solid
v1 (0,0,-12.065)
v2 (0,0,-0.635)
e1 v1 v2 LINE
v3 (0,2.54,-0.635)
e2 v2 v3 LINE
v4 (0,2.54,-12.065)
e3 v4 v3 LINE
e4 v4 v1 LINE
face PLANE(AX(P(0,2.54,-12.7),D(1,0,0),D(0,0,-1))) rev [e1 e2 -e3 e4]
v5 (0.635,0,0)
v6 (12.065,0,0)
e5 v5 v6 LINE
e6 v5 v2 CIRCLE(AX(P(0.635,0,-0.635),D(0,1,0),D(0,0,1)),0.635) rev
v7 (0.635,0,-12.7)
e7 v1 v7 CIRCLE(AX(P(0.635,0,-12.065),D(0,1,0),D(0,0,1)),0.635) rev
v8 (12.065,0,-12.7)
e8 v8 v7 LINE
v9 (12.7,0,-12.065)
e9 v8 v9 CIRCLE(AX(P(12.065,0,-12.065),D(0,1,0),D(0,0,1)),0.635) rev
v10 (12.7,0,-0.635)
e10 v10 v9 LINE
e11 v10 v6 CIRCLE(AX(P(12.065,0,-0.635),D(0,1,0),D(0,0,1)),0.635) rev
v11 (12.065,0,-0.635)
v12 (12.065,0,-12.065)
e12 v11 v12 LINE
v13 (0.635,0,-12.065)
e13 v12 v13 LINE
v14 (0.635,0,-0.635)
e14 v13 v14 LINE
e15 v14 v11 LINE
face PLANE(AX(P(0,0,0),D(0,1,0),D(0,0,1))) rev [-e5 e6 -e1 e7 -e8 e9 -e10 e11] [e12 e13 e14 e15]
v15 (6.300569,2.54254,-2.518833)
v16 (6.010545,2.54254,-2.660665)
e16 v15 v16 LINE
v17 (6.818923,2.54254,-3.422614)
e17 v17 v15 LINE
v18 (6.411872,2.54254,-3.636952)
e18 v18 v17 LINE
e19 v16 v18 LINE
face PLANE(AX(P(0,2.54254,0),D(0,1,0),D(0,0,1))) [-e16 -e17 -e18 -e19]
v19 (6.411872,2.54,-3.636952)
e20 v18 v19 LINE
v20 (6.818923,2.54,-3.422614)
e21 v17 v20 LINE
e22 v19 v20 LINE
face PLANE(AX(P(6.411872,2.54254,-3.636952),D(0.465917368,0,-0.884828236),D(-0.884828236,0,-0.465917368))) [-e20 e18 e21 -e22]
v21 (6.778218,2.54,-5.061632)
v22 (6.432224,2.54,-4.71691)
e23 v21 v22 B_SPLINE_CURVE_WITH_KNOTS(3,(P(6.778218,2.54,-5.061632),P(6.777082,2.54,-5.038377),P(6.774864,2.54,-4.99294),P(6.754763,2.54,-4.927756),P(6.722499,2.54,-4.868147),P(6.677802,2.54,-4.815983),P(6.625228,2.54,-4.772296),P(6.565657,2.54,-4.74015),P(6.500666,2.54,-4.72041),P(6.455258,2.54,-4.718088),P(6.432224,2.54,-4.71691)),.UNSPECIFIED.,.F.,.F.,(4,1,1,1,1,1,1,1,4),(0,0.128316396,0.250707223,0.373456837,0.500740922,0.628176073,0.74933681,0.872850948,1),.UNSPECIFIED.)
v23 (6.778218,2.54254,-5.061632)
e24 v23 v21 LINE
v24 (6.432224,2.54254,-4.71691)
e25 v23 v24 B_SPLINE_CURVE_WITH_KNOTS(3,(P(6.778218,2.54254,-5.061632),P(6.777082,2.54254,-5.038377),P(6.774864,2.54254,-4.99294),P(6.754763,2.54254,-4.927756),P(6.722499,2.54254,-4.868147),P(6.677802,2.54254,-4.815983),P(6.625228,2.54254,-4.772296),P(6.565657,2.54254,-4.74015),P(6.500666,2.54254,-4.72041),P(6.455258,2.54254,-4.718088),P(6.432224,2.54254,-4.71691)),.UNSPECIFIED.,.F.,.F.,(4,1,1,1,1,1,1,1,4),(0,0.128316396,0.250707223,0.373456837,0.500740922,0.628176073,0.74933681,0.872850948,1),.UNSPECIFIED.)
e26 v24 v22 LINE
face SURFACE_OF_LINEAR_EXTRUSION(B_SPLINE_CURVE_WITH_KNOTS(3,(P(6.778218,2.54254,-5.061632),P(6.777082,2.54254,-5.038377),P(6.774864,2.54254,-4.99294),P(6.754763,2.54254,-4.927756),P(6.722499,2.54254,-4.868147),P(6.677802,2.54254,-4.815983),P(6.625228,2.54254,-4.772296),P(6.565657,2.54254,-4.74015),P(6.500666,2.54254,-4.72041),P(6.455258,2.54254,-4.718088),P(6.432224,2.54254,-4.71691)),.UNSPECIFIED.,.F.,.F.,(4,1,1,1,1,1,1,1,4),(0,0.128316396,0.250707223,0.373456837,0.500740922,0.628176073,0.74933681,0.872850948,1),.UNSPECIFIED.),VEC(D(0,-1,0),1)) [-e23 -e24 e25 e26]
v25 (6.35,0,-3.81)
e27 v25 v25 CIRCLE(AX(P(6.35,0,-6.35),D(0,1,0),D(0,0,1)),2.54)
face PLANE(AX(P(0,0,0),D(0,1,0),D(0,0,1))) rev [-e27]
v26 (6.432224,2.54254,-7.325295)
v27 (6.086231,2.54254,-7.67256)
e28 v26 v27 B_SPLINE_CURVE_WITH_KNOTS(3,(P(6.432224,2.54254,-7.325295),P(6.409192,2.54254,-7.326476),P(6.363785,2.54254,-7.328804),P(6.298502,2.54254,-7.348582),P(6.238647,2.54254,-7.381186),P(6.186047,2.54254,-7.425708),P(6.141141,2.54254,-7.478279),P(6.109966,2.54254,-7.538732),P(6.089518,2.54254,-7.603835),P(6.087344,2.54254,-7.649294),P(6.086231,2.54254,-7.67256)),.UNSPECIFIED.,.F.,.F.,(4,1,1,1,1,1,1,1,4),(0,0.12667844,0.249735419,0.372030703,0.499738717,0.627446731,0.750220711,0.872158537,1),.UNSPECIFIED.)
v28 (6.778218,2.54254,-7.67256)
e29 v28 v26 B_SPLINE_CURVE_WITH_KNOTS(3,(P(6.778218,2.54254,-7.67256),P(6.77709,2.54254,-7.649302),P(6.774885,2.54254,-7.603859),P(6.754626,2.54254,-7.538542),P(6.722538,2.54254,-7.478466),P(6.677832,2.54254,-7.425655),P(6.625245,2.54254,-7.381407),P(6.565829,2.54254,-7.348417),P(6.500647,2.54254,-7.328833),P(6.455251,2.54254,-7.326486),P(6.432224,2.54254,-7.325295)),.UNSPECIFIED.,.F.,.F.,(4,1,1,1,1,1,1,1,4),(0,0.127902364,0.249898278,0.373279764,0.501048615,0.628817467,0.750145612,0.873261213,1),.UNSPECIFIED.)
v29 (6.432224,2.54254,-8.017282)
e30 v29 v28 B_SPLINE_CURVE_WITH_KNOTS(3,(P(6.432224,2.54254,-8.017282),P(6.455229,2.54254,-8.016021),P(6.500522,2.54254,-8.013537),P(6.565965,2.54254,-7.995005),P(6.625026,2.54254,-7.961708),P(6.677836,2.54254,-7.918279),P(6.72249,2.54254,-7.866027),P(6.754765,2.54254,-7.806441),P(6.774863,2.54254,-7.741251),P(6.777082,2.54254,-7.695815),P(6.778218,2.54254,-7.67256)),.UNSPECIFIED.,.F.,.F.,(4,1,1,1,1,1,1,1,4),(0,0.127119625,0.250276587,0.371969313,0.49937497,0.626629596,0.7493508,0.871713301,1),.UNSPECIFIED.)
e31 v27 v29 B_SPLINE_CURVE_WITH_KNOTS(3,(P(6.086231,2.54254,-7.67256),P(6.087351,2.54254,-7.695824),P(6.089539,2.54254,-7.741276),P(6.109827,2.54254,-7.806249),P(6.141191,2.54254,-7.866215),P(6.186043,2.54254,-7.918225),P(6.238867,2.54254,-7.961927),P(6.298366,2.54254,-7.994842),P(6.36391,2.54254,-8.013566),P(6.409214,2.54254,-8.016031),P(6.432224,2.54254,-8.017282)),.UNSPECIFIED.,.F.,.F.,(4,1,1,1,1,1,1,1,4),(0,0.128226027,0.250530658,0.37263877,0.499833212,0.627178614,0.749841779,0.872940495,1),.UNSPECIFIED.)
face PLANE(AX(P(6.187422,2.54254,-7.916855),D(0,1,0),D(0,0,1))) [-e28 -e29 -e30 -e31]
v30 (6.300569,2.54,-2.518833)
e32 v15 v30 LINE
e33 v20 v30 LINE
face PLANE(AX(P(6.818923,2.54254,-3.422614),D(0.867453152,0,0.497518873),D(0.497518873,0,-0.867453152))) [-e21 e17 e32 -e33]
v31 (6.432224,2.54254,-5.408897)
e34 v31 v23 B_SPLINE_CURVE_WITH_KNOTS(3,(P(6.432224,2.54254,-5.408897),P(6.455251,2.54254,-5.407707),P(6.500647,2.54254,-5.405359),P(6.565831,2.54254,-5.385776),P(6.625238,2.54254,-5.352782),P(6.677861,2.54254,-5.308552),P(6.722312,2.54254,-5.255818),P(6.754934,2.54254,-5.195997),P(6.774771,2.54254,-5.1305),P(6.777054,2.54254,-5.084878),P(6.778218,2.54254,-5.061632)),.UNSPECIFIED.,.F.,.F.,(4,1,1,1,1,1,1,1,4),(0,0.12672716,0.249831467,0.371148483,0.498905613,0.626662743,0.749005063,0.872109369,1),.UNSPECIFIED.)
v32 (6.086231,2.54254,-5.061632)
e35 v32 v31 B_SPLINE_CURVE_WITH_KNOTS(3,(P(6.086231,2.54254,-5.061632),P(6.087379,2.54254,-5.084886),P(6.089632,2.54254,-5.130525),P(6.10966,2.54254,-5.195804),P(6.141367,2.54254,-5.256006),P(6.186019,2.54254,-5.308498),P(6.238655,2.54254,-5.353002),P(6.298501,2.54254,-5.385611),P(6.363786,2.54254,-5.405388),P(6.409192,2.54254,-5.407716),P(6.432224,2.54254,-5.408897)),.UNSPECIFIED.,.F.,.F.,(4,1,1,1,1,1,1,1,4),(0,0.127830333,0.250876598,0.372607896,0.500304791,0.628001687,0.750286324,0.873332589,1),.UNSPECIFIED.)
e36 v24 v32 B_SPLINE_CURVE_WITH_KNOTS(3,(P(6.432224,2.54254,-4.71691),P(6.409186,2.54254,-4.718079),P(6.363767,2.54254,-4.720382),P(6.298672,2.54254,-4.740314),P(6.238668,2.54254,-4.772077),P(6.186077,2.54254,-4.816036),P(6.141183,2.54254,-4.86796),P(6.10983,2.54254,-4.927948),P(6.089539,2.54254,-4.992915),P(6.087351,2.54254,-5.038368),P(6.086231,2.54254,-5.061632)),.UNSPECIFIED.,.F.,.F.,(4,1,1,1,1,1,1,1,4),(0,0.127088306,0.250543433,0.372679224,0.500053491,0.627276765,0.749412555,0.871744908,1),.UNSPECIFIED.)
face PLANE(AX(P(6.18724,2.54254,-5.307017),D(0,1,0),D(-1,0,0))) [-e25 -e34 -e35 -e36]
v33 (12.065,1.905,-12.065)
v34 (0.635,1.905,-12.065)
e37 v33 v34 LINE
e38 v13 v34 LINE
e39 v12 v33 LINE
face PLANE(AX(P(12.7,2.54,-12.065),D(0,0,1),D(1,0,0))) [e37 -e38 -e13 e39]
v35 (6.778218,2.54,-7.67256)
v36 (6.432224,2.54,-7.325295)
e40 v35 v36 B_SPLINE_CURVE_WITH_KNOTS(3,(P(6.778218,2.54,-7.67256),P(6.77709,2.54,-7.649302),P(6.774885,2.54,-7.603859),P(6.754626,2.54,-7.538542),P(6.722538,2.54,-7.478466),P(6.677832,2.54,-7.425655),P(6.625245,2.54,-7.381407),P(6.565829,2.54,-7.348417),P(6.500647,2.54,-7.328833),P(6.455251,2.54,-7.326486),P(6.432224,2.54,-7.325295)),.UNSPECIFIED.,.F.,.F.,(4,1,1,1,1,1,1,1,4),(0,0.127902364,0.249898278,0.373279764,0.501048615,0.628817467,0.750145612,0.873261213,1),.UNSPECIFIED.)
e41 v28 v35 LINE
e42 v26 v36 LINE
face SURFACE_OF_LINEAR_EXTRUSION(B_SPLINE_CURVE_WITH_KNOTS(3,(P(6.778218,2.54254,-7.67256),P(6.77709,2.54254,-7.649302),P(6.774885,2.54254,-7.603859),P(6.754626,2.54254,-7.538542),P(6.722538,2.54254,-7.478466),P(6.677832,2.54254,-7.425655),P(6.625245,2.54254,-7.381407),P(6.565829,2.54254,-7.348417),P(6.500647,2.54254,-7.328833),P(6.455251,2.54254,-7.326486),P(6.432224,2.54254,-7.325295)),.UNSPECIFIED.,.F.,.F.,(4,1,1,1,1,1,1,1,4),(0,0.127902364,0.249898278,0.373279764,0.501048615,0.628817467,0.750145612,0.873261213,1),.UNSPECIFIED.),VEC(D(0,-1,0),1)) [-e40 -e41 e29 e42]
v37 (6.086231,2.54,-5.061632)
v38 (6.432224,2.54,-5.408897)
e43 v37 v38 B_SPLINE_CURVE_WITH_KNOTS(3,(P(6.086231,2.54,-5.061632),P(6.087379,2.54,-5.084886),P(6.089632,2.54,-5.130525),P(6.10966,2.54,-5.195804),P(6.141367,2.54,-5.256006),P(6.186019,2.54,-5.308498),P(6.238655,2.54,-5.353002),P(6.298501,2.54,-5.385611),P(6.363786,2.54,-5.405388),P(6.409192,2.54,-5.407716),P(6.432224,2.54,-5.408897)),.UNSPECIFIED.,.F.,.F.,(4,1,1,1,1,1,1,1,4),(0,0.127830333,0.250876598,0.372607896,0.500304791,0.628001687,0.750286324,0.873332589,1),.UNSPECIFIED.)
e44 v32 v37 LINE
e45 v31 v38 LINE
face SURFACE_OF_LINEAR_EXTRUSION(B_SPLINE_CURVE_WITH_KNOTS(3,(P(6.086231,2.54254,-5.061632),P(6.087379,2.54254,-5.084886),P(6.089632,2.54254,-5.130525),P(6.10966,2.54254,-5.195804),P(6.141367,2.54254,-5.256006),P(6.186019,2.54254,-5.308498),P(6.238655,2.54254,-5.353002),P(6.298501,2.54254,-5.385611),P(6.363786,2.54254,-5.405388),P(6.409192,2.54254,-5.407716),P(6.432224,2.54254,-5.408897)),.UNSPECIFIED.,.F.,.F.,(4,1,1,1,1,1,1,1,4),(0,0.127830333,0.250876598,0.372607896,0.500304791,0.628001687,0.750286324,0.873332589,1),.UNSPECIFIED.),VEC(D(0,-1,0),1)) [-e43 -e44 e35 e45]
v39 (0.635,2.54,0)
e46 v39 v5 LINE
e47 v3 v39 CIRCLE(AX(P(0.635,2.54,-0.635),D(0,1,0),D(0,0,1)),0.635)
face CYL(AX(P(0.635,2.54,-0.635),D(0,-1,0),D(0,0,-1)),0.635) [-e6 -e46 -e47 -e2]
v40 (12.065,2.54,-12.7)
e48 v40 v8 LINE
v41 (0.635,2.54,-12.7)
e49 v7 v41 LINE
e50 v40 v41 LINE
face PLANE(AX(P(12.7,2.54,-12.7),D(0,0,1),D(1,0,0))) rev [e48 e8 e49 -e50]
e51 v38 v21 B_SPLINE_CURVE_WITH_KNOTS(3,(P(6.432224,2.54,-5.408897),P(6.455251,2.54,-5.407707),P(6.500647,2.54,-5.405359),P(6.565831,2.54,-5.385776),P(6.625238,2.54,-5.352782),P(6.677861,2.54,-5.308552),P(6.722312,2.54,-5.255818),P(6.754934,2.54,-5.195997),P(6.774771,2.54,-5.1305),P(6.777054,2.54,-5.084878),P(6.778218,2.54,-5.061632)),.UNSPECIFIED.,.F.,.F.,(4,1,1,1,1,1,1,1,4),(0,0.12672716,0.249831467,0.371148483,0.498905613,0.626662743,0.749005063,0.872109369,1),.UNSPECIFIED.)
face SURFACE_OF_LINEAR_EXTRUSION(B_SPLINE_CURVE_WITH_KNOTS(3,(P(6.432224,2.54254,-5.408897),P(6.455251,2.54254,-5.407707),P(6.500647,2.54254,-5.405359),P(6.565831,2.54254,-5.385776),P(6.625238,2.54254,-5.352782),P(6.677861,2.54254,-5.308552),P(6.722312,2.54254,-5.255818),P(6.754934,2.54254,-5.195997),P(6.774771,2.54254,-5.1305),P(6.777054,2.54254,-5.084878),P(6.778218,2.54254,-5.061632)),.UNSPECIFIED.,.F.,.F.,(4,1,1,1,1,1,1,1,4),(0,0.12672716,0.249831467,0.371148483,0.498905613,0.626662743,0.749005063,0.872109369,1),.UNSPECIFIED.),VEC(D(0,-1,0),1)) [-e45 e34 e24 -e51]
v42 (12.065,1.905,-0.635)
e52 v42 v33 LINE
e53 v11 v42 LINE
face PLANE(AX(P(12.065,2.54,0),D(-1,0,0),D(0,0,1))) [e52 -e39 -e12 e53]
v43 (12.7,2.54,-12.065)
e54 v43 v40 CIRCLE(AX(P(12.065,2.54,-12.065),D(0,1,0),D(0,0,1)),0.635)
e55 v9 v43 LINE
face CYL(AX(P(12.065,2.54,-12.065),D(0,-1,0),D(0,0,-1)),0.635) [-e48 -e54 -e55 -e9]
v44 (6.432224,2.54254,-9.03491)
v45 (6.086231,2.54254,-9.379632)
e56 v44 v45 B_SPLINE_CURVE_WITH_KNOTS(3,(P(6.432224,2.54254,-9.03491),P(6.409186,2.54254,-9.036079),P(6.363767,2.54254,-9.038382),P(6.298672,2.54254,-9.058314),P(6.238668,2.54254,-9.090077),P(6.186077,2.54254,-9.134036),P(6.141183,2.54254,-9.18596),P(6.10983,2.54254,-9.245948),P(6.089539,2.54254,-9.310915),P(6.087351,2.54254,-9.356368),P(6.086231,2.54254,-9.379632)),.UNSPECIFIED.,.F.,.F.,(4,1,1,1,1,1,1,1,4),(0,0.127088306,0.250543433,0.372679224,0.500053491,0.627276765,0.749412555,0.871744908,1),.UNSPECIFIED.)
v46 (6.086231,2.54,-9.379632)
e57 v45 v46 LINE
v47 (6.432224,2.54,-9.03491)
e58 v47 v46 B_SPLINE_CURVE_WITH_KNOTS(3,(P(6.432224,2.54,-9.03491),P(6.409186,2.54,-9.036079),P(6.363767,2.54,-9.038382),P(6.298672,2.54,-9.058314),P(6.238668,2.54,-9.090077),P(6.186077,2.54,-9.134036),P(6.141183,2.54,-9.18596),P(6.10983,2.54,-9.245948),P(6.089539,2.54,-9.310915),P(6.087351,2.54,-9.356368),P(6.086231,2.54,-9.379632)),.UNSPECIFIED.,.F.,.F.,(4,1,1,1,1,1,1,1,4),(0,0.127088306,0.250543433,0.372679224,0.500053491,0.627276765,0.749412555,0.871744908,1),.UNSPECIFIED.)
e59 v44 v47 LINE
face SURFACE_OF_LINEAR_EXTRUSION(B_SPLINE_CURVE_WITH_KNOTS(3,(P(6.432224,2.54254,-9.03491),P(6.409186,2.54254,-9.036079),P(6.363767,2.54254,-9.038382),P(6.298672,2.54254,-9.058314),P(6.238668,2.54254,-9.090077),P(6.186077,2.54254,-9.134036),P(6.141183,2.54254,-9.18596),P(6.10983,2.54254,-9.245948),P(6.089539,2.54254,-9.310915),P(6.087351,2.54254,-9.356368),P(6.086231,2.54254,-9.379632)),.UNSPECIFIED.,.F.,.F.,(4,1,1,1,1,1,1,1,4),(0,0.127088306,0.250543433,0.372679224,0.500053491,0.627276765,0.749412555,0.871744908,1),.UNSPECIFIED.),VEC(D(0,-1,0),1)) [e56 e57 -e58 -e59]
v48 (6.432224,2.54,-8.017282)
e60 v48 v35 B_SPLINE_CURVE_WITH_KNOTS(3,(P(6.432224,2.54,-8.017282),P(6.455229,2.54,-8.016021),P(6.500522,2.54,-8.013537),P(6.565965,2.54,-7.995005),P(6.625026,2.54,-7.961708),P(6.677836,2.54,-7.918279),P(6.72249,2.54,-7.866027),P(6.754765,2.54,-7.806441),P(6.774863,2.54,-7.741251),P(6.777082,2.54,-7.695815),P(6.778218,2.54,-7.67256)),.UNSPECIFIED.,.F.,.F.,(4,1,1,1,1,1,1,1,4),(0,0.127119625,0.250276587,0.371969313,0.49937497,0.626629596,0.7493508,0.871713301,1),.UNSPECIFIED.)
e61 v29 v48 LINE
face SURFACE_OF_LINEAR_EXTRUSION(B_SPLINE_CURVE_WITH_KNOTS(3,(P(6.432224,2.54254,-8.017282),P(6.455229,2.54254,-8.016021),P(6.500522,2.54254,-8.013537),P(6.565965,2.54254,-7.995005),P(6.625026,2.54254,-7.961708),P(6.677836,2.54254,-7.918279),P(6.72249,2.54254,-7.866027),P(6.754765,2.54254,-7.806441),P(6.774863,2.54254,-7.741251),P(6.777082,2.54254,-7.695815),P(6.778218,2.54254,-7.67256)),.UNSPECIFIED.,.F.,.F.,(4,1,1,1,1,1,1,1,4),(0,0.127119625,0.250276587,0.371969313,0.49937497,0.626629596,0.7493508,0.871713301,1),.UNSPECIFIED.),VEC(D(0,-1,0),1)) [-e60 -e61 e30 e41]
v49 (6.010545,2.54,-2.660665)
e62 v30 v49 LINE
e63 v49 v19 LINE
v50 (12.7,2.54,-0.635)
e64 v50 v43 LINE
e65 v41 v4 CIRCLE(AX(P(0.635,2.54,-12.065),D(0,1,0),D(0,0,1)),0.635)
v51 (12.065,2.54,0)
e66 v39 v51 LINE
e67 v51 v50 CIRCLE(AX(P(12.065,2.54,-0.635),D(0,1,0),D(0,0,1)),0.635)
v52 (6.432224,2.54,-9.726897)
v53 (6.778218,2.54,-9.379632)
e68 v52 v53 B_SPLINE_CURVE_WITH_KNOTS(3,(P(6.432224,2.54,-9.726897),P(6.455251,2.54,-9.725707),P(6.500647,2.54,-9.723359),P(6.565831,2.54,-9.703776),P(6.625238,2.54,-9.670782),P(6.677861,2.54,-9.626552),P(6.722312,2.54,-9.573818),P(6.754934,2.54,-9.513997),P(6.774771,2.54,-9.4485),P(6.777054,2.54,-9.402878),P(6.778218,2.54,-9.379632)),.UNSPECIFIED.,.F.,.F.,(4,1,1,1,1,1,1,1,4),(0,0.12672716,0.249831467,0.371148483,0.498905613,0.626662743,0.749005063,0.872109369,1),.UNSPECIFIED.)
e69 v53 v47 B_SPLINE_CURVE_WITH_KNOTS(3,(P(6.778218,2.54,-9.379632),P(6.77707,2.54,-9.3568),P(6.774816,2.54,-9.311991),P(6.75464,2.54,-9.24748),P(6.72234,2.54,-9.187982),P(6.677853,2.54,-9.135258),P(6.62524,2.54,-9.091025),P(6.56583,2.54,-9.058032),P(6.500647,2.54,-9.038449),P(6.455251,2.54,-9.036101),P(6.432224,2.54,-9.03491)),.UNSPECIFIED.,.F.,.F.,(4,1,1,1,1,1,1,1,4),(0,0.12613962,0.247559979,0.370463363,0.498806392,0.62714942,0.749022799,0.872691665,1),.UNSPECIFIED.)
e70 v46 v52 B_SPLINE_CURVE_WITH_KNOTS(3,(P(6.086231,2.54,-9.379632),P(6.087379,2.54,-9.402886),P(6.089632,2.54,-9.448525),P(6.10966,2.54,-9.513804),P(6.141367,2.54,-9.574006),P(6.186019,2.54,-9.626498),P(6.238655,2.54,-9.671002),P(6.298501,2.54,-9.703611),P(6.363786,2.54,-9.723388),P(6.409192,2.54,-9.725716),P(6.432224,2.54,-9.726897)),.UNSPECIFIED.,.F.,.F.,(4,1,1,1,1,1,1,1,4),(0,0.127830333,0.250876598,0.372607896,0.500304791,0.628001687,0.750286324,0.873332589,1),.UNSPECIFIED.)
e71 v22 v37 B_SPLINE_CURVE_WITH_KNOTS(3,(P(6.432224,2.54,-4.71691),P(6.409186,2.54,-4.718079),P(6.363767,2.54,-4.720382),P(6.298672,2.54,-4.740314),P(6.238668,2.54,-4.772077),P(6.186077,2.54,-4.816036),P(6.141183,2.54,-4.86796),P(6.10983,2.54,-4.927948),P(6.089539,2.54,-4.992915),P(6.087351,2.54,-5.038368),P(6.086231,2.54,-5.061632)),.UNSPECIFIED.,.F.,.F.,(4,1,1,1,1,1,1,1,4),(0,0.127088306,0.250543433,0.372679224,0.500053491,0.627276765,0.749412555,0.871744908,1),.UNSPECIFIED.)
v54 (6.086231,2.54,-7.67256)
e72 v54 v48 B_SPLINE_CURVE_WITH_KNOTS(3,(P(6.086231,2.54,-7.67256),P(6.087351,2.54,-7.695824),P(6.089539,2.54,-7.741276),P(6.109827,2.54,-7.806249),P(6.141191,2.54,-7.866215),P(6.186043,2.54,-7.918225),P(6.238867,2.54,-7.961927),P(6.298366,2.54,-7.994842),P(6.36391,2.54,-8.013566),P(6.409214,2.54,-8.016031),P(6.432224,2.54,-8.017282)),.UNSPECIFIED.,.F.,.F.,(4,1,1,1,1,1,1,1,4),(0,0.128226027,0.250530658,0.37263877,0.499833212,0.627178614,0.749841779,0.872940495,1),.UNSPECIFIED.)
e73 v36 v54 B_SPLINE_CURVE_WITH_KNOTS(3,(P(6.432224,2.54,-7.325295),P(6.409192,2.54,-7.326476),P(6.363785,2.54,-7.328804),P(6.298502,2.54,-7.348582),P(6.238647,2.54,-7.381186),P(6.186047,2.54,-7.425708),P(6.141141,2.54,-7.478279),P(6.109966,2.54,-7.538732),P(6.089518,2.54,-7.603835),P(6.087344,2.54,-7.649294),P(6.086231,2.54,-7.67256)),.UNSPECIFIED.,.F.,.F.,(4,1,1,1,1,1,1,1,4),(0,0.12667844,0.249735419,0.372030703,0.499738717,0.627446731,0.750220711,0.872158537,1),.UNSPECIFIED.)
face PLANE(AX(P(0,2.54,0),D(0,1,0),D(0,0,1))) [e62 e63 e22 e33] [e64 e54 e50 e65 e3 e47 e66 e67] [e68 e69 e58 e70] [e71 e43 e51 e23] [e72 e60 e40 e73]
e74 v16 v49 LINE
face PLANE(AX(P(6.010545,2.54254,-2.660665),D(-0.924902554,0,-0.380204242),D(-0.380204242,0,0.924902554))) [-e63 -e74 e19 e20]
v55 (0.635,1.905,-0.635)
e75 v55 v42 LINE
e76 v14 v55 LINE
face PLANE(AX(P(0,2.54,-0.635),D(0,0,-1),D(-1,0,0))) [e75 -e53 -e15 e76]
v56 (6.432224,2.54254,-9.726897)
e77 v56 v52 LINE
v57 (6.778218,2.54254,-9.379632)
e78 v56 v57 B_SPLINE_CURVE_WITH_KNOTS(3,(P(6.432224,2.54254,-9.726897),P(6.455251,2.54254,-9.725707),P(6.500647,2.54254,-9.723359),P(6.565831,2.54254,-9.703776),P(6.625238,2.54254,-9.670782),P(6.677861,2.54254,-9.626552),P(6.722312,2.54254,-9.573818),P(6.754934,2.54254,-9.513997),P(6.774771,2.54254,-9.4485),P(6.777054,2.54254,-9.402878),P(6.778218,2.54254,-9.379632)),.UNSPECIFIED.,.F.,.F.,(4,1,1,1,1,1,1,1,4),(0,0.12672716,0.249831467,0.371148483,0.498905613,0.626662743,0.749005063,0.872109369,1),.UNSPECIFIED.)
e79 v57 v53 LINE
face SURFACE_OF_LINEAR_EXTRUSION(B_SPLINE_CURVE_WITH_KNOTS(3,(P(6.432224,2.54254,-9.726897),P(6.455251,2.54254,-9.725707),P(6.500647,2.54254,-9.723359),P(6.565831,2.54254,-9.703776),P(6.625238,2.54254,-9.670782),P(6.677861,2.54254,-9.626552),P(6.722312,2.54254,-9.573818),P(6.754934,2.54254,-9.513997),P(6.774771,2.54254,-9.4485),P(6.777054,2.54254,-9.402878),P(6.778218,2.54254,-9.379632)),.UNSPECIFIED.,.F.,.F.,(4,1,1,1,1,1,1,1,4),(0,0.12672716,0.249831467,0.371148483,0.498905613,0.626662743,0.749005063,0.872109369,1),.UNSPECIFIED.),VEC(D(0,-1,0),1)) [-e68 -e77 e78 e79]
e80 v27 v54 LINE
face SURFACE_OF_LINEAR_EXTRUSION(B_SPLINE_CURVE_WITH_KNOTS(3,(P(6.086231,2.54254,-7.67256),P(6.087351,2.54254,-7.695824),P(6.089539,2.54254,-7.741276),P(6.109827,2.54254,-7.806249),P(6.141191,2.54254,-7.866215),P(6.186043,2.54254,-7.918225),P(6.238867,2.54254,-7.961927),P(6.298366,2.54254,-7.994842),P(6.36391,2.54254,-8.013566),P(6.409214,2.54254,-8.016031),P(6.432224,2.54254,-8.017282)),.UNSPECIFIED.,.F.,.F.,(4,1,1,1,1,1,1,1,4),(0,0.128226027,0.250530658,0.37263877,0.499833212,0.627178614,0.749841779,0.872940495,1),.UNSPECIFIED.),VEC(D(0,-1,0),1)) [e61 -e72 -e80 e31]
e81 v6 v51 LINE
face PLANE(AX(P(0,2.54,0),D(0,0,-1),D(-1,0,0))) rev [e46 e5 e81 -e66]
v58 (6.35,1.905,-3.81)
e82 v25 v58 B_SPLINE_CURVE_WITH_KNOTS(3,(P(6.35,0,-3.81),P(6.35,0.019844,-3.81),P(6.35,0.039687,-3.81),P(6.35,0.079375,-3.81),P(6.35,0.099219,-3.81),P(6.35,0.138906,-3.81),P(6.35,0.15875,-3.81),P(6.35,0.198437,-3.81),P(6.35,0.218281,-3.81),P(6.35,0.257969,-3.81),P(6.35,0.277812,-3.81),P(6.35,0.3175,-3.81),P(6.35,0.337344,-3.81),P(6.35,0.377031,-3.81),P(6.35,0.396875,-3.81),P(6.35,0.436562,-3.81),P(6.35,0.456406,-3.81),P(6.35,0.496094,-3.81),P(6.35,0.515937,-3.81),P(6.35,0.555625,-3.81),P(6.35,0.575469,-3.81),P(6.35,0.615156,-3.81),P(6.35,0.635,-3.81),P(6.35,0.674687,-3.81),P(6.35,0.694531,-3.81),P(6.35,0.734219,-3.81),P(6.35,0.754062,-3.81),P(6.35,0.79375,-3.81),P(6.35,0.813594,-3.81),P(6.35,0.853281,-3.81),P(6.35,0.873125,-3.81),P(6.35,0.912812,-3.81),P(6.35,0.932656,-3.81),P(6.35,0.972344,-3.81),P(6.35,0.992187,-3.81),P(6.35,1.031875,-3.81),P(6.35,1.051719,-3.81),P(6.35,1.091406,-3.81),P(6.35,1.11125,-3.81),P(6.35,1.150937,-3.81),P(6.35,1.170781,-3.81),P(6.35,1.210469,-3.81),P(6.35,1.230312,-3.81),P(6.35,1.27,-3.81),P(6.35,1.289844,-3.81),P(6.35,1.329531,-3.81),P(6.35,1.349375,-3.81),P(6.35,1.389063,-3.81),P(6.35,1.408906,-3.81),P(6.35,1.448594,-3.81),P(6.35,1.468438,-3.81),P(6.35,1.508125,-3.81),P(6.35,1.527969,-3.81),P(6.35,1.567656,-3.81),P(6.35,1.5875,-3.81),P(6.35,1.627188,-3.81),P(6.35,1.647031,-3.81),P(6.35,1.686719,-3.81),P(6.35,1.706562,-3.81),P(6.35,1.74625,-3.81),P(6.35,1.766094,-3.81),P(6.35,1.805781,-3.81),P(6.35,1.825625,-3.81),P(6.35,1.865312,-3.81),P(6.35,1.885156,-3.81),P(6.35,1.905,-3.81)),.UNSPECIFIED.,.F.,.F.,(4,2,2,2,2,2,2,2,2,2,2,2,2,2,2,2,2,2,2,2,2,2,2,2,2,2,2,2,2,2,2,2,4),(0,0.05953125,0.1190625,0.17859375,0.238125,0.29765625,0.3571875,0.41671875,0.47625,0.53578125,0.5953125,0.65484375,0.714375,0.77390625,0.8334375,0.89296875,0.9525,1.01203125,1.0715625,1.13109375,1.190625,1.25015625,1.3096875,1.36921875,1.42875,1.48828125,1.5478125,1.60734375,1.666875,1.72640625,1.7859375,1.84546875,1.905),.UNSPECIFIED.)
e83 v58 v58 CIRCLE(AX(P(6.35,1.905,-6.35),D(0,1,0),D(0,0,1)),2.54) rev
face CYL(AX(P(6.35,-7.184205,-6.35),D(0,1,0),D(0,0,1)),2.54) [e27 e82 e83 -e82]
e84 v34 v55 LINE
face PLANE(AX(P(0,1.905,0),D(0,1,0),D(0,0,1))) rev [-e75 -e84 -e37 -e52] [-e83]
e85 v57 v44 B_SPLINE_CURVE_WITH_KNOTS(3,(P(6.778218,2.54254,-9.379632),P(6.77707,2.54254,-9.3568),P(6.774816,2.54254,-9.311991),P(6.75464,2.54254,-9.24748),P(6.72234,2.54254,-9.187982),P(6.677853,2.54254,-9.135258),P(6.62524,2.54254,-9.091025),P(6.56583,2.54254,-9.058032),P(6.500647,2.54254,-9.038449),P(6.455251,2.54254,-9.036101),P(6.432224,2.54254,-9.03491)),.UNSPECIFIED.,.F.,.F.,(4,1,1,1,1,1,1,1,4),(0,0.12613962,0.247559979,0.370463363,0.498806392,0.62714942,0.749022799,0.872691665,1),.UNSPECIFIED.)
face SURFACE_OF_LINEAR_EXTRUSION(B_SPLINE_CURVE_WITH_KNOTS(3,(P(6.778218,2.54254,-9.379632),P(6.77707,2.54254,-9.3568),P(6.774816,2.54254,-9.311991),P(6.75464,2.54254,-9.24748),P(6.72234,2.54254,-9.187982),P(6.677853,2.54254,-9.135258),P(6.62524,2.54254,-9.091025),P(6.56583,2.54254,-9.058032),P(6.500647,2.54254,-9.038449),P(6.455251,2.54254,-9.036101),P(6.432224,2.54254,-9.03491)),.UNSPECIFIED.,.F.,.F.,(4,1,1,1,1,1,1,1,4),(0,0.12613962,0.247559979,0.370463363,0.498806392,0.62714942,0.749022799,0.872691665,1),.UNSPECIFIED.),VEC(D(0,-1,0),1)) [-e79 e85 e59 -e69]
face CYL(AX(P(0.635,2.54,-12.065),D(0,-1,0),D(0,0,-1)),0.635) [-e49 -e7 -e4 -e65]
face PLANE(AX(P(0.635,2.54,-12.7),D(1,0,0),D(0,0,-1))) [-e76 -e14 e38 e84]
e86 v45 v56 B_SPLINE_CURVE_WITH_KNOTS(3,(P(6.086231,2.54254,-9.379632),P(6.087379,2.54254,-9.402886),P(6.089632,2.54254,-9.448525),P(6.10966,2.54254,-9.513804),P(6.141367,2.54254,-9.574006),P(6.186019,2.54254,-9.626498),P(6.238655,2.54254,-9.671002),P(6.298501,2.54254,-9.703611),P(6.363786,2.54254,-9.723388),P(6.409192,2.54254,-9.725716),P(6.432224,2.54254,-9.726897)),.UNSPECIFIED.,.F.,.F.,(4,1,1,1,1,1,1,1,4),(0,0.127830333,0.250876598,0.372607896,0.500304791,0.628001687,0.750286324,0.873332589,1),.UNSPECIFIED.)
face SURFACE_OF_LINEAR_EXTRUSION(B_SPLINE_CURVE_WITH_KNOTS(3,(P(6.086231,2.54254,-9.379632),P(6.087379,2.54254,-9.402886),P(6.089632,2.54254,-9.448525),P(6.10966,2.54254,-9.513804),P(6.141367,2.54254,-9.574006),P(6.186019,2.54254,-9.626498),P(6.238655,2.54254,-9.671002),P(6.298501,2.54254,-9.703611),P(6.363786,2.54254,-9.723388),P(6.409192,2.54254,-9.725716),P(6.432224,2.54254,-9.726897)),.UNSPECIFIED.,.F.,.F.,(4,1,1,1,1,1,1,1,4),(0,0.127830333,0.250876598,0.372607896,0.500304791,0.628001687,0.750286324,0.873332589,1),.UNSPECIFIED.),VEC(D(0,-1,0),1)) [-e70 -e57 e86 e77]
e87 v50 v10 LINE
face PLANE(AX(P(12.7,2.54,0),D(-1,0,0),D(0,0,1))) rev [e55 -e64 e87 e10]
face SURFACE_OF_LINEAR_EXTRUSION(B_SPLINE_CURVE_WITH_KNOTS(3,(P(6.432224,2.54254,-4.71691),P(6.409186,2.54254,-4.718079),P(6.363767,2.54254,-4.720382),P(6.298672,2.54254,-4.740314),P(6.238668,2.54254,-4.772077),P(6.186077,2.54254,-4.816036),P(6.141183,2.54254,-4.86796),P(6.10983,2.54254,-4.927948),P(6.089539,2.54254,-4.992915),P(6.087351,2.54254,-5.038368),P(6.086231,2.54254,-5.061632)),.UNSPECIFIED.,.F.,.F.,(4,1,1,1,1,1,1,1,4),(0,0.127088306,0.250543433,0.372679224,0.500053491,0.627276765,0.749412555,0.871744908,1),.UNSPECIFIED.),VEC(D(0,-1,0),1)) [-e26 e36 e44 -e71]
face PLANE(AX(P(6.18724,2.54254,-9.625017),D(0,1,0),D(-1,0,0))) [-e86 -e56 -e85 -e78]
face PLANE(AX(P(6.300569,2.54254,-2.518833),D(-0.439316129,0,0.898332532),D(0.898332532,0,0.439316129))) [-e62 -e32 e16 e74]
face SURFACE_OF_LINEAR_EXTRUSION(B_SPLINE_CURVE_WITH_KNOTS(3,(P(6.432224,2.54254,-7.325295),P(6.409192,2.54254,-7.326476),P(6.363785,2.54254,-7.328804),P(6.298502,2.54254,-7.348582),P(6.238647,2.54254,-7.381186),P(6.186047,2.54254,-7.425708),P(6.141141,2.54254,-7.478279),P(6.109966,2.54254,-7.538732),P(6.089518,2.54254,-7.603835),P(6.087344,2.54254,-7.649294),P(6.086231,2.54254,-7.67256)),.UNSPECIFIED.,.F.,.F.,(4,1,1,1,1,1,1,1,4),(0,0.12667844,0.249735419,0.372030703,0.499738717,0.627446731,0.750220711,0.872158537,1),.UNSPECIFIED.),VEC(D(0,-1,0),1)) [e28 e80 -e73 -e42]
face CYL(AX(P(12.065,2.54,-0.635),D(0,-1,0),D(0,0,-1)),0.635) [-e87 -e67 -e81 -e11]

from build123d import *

# Parameters (mm, degrees)
SKETCH1_W           = 12.7
SKETCH1_H           = 12.7
BOSS_EXTRUDE1_DEPTH = 2.54
FILLET1_R           = 0.635
SHELL1_START        = 0.635
SHELL1_OUTLINE_W    = 1.905
SHELL1_OUTLINE_H    = 11.43
SHELL1_DEPTH        = 11.43
SKETCH2_R           = 2.54
BOSS_EXTRUDE2_DEPTH = 1.905
BOSS_EXTRUDE3_DEPTH = 0.00254


# Read off the part's stored shape, not the designer's step: Shell1
with BuildPart() as part:
    # Sketch1 → Boss-Extrude1 (new body)
    with BuildSketch(Plane(origin=(0, 0, 0), x_dir=(1, 0, 0), z_dir=(0, 1, 0))):
        with Locations((6.35, 6.35)):
            Rectangle(SKETCH1_W, SKETCH1_H)
    extrude(amount=BOSS_EXTRUDE1_DEPTH)

    # Fillet1
    fillet1_edges = [part.edges().sort_by_distance(p)[0] for p in [
        (0, 1.27, -12.7),
        (12.7, 1.27, -12.7),
        (12.7, 1.27, 0),
        (0, 1.27, 0),
    ]]
    fillet(fillet1_edges, radius=FILLET1_R)

    # Shell1 outline → Shell1 (cut)
    with BuildSketch(Plane.YZ.offset(SHELL1_START)):
        with Locations((0.9525, -6.35)):
            Rectangle(SHELL1_OUTLINE_W, SHELL1_OUTLINE_H)
    extrude(amount=SHELL1_DEPTH, mode=Mode.SUBTRACT)

    # Sketch2 → Boss-Extrude2 (add)
    with BuildSketch(Plane(origin=(0, 1.905, 0), x_dir=(-1, 0, 0), z_dir=(0, -1, 0))):
        with Locations(Location((-6.35, 6.35, 0), (0, 0, 270))):
            Circle(SKETCH2_R)
    extrude(amount=BOSS_EXTRUDE2_DEPTH)

    # Sketch3 → Boss-Extrude3 (add)
    with BuildSketch(Plane(origin=(0, 2.54, 0), x_dir=(1, 0, 0), z_dir=(0, 1, 0))):
        with BuildLine():
            add(Edge.make_bspline(
                [(6.432224359, 9.726897436), (6.455251183, 9.725706594), (6.500646544, 9.723358955), (6.565830657, 9.703776202), (6.625237948, 9.670782167), (6.67786071, 9.626551956), (6.722312309, 9.573817503), (6.754934047, 9.513997076), (6.774770917, 9.4485002), (6.777054423, 9.402877937), (6.778217949, 9.379631811)],
                knots=[0, 0, 0, 0, 1.013817282, 1.998651736, 2.969187861, 3.991244904, 5.013301947, 5.9920405, 6.976874954, 8, 8, 8, 8], degree=3))
            add(Edge.make_bspline(
                [(6.778217949, 9.379631811), (6.777069623, 9.356799998), (6.774815935, 9.311990578), (6.754640219, 9.247480223), (6.72234006, 9.18798217), (6.677853125, 9.135257928), (6.625239865, 9.091024972), (6.565830149, 9.058031637), (6.500646676, 9.038448699), (6.455251227, 9.036101085), (6.432224359, 9.034910256)],
                knots=[0, 0, 0, 0, 1.009116963, 1.980479832, 2.963706907, 3.990451133, 5.017195359, 5.992182391, 6.981533323, 8, 8, 8, 8], degree=3))
            add(Edge.make_bspline(
                [(6.432224359, 9.034910256), (6.409185604, 9.036078537), (6.363766721, 9.0383817), (6.298671705, 9.058314456), (6.238667642, 9.090077481), (6.186076647, 9.134036199), (6.141182927, 9.18595953), (6.109829566, 9.245948014), (6.089538882, 9.310915397), (6.087350713, 9.356368241), (6.086230769, 9.379631811)],
                knots=[0, 0, 0, 0, 1.016706445, 2.004347467, 2.981433789, 4.000427929, 5.018214116, 5.995300439, 6.973959266, 8, 8, 8, 8], degree=3))
            add(Edge.make_bspline(
                [(6.086230769, 9.379631811), (6.087378792, 9.402886411), (6.089631872, 9.448525304), (6.109660198, 9.513804333), (6.141367354, 9.574006456), (6.186018885, 9.626497828), (6.238654577, 9.671002499), (6.29850054, 9.703611102), (6.363785957, 9.723387734), (6.409192077, 9.72571628), (6.432224359, 9.726897436)],
                knots=[0, 0, 0, 0, 1.022642663, 2.007012786, 2.980863166, 4.002438329, 5.024013493, 6.00229059, 6.986660713, 8, 8, 8, 8], degree=3))
        make_face()
        with BuildLine():
            add(Edge.make_bspline(
                [(6.432224359, 8.017282051), (6.455229408, 8.01602074), (6.500522375, 8.013537435), (6.565964538, 7.995004793), (6.625026467, 7.96170826), (6.677835723, 7.918278705), (6.722489899, 7.866027151), (6.754764929, 7.806440642), (6.774863399, 7.741250637), (6.777082284, 7.695815172), (6.778217949, 7.672560497)],
                knots=[0, 0, 0, 0, 1.016957001, 2.002212695, 2.9757545, 3.99499976, 5.013036768, 5.994806404, 6.97370641, 8, 8, 8, 8], degree=3))
            add(Edge.make_bspline(
                [(6.778217949, 7.672560497), (6.777089724, 7.649302087), (6.774885374, 7.603859325), (6.754625849, 7.538542292), (6.722538129, 7.478466037), (6.67783214, 7.425654573), (6.625245168, 7.381406547), (6.565828744, 7.348417057), (6.500647041, 7.328833105), (6.45525135, 7.32648563), (6.432224359, 7.325294872)],
                knots=[0, 0, 0, 0, 1.023218912, 1.999186227, 2.986238111, 4.008388923, 5.030539734, 6.0011649, 6.986089706, 8, 8, 8, 8], degree=3))
            add(Edge.make_bspline(
                [(6.432224359, 7.325294872), (6.409191911, 7.326475947), (6.363785464, 7.328804333), (6.298502441, 7.348582131), (6.238647359, 7.381186296), (6.186047174, 7.425708246), (6.141141459, 7.478279027), (6.109966022, 7.538731843), (6.089517785, 7.603834699), (6.087343571, 7.64929375), (6.086230769, 7.672560497)],
                knots=[0, 0, 0, 0, 1.013427518, 1.99788335, 2.976245624, 3.997909735, 5.019573847, 6.001765691, 6.977268297, 8, 8, 8, 8], degree=3))
            add(Edge.make_bspline(
                [(6.086230769, 7.672560497), (6.087350912, 7.695823654), (6.089539471, 7.741275691), (6.109827339, 7.806248907), (6.141191423, 7.866215177), (6.186043429, 7.91822492), (6.238867187, 7.961926791), (6.298365885, 7.994841981), (6.363910067, 8.01356642), (6.409213828, 8.016030503), (6.432224359, 8.017282051)],
                knots=[0, 0, 0, 0, 1.025808215, 2.00424526, 2.981110158, 3.998665696, 5.017428914, 5.998734231, 6.983523959, 8, 8, 8, 8], degree=3))
        make_face()
        with BuildLine():
            add(Edge.make_bspline(
                [(6.432224359, 5.408897436), (6.455251183, 5.407706594), (6.500646544, 5.405358955), (6.565830657, 5.385776202), (6.625237948, 5.352782167), (6.67786071, 5.308551956), (6.722312309, 5.255817503), (6.754934047, 5.195997076), (6.774770917, 5.1305002), (6.777054423, 5.084877937), (6.778217949, 5.061631811)],
                knots=[0, 0, 0, 0, 1.013817282, 1.998651736, 2.969187861, 3.991244904, 5.013301947, 5.9920405, 6.976874954, 8, 8, 8, 8], degree=3))
            add(Edge.make_bspline(
                [(6.778217949, 5.061631811), (6.777082486, 5.038376721), (6.774863996, 4.992940445), (6.754762665, 4.92775631), (6.722498561, 4.868147384), (6.677802035, 4.815982727), (6.625228174, 4.772296035), (6.56565729, 4.740149638), (6.500666175, 4.720410262), (6.45525779, 4.718088149), (6.432224359, 4.716910256)],
                knots=[0, 0, 0, 0, 1.02653117, 2.005657786, 2.987654694, 4.005927372, 5.02540858, 5.994694477, 6.98280758, 8, 8, 8, 8], degree=3))
            add(Edge.make_bspline(
                [(6.432224359, 4.716910256), (6.409185604, 4.718078537), (6.363766721, 4.7203817), (6.298671705, 4.740314456), (6.238667642, 4.772077481), (6.186076647, 4.816036199), (6.141182927, 4.86795953), (6.109829566, 4.927948014), (6.089538882, 4.992915397), (6.087350713, 5.038368241), (6.086230769, 5.061631811)],
                knots=[0, 0, 0, 0, 1.016706445, 2.004347467, 2.981433789, 4.000427929, 5.018214116, 5.995300439, 6.973959266, 8, 8, 8, 8], degree=3))
            add(Edge.make_bspline(
                [(6.086230769, 5.061631811), (6.087378792, 5.084886411), (6.089631872, 5.130525304), (6.109660198, 5.195804333), (6.141367354, 5.256006456), (6.186018885, 5.308497828), (6.238654577, 5.353002499), (6.29850054, 5.385611102), (6.363785957, 5.405387734), (6.409192077, 5.40771628), (6.432224359, 5.408897436)],
                knots=[0, 0, 0, 0, 1.022642663, 2.007012786, 2.980863166, 4.002438329, 5.024013493, 6.00229059, 6.986660713, 8, 8, 8, 8], degree=3))
        make_face()
        Polygon((6.411871795, 3.636952324), (6.818923077, 3.422614383), (6.30056871, 2.518833333), (6.010544671, 2.660665264), align=None)
    extrude(amount=BOSS_EXTRUDE3_DEPTH)


solid = part.part
